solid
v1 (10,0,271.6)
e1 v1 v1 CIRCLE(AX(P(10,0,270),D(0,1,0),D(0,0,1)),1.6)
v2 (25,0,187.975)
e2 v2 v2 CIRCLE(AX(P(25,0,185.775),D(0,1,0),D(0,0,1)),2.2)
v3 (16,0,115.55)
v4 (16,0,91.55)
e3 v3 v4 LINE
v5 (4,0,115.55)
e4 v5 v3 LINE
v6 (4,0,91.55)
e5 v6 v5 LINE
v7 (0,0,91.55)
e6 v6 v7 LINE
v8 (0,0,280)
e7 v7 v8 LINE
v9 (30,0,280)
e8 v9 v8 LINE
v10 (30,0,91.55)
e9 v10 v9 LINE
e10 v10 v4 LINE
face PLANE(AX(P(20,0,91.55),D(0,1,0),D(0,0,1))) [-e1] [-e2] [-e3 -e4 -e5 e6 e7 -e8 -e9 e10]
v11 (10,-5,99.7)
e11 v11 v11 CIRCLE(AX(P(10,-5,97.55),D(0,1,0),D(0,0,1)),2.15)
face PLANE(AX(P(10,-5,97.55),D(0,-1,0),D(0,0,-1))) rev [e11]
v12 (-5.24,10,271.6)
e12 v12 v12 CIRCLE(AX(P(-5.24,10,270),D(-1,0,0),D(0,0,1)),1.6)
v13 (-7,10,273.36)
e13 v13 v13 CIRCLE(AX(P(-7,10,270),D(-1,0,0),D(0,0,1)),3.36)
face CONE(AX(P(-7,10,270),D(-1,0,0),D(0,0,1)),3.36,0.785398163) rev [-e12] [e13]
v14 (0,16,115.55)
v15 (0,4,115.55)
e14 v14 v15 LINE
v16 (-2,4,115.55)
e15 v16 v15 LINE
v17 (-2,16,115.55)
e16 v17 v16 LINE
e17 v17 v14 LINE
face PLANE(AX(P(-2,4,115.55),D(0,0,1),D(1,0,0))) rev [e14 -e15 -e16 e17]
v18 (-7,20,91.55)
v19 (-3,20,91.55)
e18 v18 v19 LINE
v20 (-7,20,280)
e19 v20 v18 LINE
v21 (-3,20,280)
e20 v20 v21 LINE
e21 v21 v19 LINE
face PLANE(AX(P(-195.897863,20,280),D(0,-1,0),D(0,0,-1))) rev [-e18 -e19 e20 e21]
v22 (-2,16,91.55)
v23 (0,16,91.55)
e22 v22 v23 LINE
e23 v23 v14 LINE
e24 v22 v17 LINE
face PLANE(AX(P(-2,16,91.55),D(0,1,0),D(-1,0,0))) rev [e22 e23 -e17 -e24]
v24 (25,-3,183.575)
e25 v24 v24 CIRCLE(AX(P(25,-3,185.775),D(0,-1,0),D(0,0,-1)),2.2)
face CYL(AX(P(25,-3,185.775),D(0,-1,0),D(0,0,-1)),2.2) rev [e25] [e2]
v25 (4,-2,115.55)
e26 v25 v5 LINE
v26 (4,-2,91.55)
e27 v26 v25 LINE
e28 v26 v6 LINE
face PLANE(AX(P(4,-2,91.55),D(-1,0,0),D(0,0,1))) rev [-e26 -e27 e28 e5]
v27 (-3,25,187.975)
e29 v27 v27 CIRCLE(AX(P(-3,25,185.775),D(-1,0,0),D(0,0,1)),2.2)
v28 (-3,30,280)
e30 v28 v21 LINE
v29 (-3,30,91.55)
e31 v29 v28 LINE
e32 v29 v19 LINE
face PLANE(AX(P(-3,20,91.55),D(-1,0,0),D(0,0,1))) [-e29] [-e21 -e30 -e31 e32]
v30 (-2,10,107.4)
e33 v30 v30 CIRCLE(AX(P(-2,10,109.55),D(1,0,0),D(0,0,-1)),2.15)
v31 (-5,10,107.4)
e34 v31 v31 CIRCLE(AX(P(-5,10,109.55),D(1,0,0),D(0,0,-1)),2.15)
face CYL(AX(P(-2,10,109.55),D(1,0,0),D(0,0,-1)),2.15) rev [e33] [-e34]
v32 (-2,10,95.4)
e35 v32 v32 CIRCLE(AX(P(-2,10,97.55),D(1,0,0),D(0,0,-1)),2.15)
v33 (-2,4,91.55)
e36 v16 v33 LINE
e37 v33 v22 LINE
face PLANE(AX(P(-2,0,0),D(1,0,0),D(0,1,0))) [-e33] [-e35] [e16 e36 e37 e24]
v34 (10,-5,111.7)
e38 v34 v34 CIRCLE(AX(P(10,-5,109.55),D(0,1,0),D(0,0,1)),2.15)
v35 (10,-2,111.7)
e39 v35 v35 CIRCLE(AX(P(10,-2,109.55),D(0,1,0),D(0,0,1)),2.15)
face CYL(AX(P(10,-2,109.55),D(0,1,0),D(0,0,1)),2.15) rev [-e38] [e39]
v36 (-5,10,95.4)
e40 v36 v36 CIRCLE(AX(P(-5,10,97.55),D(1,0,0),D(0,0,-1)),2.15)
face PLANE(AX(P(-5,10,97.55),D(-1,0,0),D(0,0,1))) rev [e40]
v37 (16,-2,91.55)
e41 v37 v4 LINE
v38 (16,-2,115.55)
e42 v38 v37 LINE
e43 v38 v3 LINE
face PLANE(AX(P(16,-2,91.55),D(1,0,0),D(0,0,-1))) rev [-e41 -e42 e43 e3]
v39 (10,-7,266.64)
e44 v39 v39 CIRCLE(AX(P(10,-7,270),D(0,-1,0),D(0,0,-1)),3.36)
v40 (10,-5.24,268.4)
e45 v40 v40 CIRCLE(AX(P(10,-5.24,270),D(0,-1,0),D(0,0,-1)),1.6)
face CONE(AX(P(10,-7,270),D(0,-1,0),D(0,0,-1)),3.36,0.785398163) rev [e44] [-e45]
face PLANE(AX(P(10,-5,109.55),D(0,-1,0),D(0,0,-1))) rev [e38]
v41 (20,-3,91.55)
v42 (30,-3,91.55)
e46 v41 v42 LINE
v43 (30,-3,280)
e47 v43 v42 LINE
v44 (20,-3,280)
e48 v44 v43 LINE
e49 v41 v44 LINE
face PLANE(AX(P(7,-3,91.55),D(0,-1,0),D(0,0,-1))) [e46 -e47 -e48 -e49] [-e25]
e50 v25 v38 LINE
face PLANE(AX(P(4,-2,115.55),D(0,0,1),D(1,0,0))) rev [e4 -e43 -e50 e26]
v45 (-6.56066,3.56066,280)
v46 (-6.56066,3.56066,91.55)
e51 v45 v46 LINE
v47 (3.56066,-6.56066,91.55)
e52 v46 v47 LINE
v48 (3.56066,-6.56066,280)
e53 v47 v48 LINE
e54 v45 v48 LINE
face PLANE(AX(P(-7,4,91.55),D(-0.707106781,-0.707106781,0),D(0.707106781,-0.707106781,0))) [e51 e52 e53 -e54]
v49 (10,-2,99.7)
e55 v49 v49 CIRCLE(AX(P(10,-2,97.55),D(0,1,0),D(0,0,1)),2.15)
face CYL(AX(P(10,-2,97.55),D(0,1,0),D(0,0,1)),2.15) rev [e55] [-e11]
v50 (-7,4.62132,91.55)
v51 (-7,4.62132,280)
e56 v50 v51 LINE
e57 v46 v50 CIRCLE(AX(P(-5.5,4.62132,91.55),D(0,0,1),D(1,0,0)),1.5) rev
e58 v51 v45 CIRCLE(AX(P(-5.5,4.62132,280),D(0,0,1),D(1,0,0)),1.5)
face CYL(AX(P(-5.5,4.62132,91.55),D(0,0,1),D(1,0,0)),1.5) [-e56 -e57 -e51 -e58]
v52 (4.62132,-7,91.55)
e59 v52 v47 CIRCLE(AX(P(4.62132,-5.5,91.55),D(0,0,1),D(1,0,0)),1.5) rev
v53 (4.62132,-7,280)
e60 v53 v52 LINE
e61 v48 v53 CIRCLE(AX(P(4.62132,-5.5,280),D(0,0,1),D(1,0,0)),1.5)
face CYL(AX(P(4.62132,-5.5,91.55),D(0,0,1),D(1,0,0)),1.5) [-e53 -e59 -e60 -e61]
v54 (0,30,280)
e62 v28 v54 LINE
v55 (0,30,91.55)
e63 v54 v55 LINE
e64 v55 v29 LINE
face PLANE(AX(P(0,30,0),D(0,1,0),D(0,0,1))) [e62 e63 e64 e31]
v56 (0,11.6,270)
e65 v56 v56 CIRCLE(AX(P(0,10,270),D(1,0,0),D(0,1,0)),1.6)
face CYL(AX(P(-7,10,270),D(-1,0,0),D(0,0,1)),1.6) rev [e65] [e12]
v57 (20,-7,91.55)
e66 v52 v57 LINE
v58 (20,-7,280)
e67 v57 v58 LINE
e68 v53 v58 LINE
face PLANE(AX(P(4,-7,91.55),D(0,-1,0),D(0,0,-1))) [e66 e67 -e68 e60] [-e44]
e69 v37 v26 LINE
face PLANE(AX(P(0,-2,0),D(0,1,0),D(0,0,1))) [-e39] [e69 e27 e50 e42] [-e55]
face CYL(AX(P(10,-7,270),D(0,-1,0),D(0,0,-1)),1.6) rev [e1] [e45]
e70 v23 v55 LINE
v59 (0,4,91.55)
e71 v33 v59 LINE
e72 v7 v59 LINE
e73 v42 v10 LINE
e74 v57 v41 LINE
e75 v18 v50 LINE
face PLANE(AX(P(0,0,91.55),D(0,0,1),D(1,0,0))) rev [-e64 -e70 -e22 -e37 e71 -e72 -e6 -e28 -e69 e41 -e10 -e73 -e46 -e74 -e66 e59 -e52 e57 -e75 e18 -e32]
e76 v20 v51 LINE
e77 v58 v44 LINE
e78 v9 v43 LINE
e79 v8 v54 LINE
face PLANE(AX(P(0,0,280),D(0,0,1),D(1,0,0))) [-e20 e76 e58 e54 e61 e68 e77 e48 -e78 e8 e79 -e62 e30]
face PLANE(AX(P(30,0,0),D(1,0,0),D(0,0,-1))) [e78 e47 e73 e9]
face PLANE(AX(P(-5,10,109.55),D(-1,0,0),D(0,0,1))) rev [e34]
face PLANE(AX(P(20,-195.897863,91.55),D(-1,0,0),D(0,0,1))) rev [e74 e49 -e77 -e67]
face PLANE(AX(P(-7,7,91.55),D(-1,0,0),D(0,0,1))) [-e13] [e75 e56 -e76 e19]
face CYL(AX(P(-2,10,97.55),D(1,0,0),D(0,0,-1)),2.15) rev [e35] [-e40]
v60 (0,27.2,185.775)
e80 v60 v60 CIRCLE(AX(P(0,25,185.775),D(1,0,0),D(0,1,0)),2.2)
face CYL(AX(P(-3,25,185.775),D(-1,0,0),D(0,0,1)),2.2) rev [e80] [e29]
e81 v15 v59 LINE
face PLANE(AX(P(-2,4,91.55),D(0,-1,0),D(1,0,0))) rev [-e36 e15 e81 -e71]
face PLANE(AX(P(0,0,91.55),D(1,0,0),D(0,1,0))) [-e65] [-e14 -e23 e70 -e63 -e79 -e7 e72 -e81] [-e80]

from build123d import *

# Parameters (mm, degrees)
BOSS_EXTRUDE1_DEPTH                = 188.45
SKETCH6_W                          = 188.45
SKETCH6_H                          = 3
BOSS_EXTRUDE2_DEPTH                = 10
SKETCH7_W                          = 13
SKETCH7_H                          = 188.45
BOSS_EXTRUDE3_DEPTH                = 4
SKETCH8_W                          = 3
SKETCH8_H                          = 188.45
BOSS_EXTRUDE4_DEPTH                = 10
SKETCH9_W                          = 188.45
SKETCH9_H                          = 13
BOSS_EXTRUDE5_DEPTH                = 4
CSK_FOR_M3_SFHCS1_D                = 3.2
CSK_FOR_M3_SFHCS1_CSINK_D          = 6.72
CSK_FOR_M3_SFHCS1_CSINK_ANGLE      = 90
CSK_FOR_M3_SFHCS2_D                = 3.2
CSK_FOR_M3_SFHCS2_CSINK_D          = 6.72
CSK_FOR_M3_SFHCS2_CSINK_ANGLE      = 90
FILLET1_R                          = 1.5
F_4_4_4_4_DIAMETER_HOLE1_D         = 4.4
F_4_4_4_4_DIAMETER_HOLE1_DEPTH     = 10
F_4_4_4_4_DIAMETER_HOLE1_TIP       = 1.321893362
F_4_4_4_4_DIAMETER_HOLE3_D         = 4.4
F_4_4_4_4_DIAMETER_HOLE3_DEPTH     = 10
F_4_4_4_4_DIAMETER_HOLE3_TIP       = 1.321893362
SKETCH18_W                         = 12
SKETCH18_H                         = 24
CUT_EXTRUDE1_DEPTH                 = 2
F_4_3_START                        = -5
F_4_3_4_3_DIAMETER_HOLE1_OUTLINE_R = 2.15
F_4_3_4_3_DIAMETER_HOLE1_DEPTH     = 3
SKETCH21_W                         = 24
SKETCH21_H                         = 12
CUT_EXTRUDE2_DEPTH                 = 2
F_4_3_4_3_DIAMETER_HOLE2_OUTLINE_R = 2.15
F_4_3_4_3_DIAMETER_HOLE2_DEPTH     = 3


# Read off the part's stored shape, not the designer's step: Ø4.3 (4.3) Diameter Hole1, Ø4.3 (4.3) Diameter Hole2
with BuildPart() as part:
    # Sketch1 → Boss-Extrude1 (new body)
    with BuildSketch(Plane.XY.offset(280)):
        Polygon((-7, 4), (4, -7), (7, -7), (7, -3), (20, -3), (20, 0), (0, 0), (0, 20), (-3, 20), (-3, 7), (-7, 7), align=None)
    extrude(amount=-BOSS_EXTRUDE1_DEPTH)

    # Sketch6 → Boss-Extrude2 (add)
    with BuildSketch(Plane(origin=(20, 0, 0), x_dir=(0, 0, -1), z_dir=(1, 0, 0))):
        with Locations((-185.775, -1.5)):
            Rectangle(SKETCH6_W, SKETCH6_H)
    extrude(amount=BOSS_EXTRUDE2_DEPTH)

    # Sketch7 → Boss-Extrude3 (add)
    with BuildSketch(Plane.XZ.offset(3)):
        with Locations((13.5, 185.775)):
            Rectangle(SKETCH7_W, SKETCH7_H)
    extrude(amount=BOSS_EXTRUDE3_DEPTH)

    # Sketch8 → Boss-Extrude4 (add)
    with BuildSketch(Plane(origin=(0, 20, 0), x_dir=(1, 0, 0), z_dir=(0, 1, 0))):
        with Locations((-1.5, -185.775)):
            Rectangle(SKETCH8_W, SKETCH8_H)
    extrude(amount=BOSS_EXTRUDE4_DEPTH)

    # Sketch9 → Boss-Extrude5 (add)
    with BuildSketch(Plane.ZY.offset(3)):
        with Locations((185.775, 13.5)):
            Rectangle(SKETCH9_W, SKETCH9_H)
    extrude(amount=BOSS_EXTRUDE5_DEPTH)

    # CSK for M3 SFHCS1 (through all)
    with Locations(Plane.XZ.offset(7)):
        with Locations((10, 270)):
            CounterSinkHole(CSK_FOR_M3_SFHCS1_D / 2, CSK_FOR_M3_SFHCS1_CSINK_D / 2, counter_sink_angle=CSK_FOR_M3_SFHCS1_CSINK_ANGLE)

    # CSK for M3 SFHCS2 (through all)
    with Locations(Plane.ZY.offset(7)):
        with Locations((270, 10)):
            CounterSinkHole(CSK_FOR_M3_SFHCS2_D / 2, CSK_FOR_M3_SFHCS2_CSINK_D / 2, counter_sink_angle=CSK_FOR_M3_SFHCS2_CSINK_ANGLE)

    # Fillet1
    fillet1_edges = [part.edges().sort_by_distance(p)[0] for p in [
        (4, -7, 185.775),
        (-7, 4, 185.775),
    ]]
    fillet(fillet1_edges, radius=FILLET1_R)

    # Ø4.4 (4.4) Diameter Hole1
    with Locations(Plane.ZY.offset(3)):
        with Locations((185.775, 25)):
            Hole(F_4_4_4_4_DIAMETER_HOLE1_D / 2, depth=F_4_4_4_4_DIAMETER_HOLE1_DEPTH)
            with Locations((0, 0, -(F_4_4_4_4_DIAMETER_HOLE1_DEPTH + F_4_4_4_4_DIAMETER_HOLE1_TIP / 2))):  # 118° drill point
                Cone(0, F_4_4_4_4_DIAMETER_HOLE1_D / 2, F_4_4_4_4_DIAMETER_HOLE1_TIP, mode=Mode.SUBTRACT)

    # Ø4.4 (4.4) Diameter Hole3
    with Locations(Plane.XZ.offset(3)):
        with Locations((25, 185.775)):
            Hole(F_4_4_4_4_DIAMETER_HOLE3_D / 2, depth=F_4_4_4_4_DIAMETER_HOLE3_DEPTH)
            with Locations((0, 0, -(F_4_4_4_4_DIAMETER_HOLE3_DEPTH + F_4_4_4_4_DIAMETER_HOLE3_TIP / 2))):  # 118° drill point
                Cone(0, F_4_4_4_4_DIAMETER_HOLE3_D / 2, F_4_4_4_4_DIAMETER_HOLE3_TIP, mode=Mode.SUBTRACT)

    # Sketch18 → Cut-Extrude1 (cut)
    with BuildSketch(Plane(origin=(0, 0, 0), x_dir=(1, 0, 0), z_dir=(0, 1, 0))):
        with Locations((10, -103.55)):
            Rectangle(SKETCH18_W, SKETCH18_H)
    extrude(amount=-CUT_EXTRUDE1_DEPTH, mode=Mode.SUBTRACT)

    # Ø4.3 (4.3) Diameter Hole1 outline → Ø4.3 (4.3) Diameter Hole1 (cut)
    with BuildSketch(Plane(origin=(0, 0, 0), x_dir=(1, 0, 0), z_dir=(0, 1, 0)).offset(F_4_3_START)):
        with Locations((10, -109.55)):
            Circle(F_4_3_4_3_DIAMETER_HOLE1_OUTLINE_R)
        with Locations((10, -97.55)):
            Circle(F_4_3_4_3_DIAMETER_HOLE1_OUTLINE_R)
    extrude(amount=F_4_3_4_3_DIAMETER_HOLE1_DEPTH, mode=Mode.SUBTRACT)

    # Sketch21 → Cut-Extrude2 (cut)
    with BuildSketch(Plane(origin=(0, 0, 0), x_dir=(0, 0, -1), z_dir=(1, 0, 0))):
        with Locations((-103.55, 10)):
            Rectangle(SKETCH21_W, SKETCH21_H)
    extrude(amount=-CUT_EXTRUDE2_DEPTH, mode=Mode.SUBTRACT)

    # Ø4.3 (4.3) Diameter Hole2 outline → Ø4.3 (4.3) Diameter Hole2 (cut)
    with BuildSketch(Plane.YZ.offset(F_4_3_START)):
        with Locations((10, 109.55)):
            Circle(F_4_3_4_3_DIAMETER_HOLE2_OUTLINE_R)
        with Locations((10, 97.55)):
            Circle(F_4_3_4_3_DIAMETER_HOLE2_OUTLINE_R)
    extrude(amount=F_4_3_4_3_DIAMETER_HOLE2_DEPTH, mode=Mode.SUBTRACT)


solid = part.part
